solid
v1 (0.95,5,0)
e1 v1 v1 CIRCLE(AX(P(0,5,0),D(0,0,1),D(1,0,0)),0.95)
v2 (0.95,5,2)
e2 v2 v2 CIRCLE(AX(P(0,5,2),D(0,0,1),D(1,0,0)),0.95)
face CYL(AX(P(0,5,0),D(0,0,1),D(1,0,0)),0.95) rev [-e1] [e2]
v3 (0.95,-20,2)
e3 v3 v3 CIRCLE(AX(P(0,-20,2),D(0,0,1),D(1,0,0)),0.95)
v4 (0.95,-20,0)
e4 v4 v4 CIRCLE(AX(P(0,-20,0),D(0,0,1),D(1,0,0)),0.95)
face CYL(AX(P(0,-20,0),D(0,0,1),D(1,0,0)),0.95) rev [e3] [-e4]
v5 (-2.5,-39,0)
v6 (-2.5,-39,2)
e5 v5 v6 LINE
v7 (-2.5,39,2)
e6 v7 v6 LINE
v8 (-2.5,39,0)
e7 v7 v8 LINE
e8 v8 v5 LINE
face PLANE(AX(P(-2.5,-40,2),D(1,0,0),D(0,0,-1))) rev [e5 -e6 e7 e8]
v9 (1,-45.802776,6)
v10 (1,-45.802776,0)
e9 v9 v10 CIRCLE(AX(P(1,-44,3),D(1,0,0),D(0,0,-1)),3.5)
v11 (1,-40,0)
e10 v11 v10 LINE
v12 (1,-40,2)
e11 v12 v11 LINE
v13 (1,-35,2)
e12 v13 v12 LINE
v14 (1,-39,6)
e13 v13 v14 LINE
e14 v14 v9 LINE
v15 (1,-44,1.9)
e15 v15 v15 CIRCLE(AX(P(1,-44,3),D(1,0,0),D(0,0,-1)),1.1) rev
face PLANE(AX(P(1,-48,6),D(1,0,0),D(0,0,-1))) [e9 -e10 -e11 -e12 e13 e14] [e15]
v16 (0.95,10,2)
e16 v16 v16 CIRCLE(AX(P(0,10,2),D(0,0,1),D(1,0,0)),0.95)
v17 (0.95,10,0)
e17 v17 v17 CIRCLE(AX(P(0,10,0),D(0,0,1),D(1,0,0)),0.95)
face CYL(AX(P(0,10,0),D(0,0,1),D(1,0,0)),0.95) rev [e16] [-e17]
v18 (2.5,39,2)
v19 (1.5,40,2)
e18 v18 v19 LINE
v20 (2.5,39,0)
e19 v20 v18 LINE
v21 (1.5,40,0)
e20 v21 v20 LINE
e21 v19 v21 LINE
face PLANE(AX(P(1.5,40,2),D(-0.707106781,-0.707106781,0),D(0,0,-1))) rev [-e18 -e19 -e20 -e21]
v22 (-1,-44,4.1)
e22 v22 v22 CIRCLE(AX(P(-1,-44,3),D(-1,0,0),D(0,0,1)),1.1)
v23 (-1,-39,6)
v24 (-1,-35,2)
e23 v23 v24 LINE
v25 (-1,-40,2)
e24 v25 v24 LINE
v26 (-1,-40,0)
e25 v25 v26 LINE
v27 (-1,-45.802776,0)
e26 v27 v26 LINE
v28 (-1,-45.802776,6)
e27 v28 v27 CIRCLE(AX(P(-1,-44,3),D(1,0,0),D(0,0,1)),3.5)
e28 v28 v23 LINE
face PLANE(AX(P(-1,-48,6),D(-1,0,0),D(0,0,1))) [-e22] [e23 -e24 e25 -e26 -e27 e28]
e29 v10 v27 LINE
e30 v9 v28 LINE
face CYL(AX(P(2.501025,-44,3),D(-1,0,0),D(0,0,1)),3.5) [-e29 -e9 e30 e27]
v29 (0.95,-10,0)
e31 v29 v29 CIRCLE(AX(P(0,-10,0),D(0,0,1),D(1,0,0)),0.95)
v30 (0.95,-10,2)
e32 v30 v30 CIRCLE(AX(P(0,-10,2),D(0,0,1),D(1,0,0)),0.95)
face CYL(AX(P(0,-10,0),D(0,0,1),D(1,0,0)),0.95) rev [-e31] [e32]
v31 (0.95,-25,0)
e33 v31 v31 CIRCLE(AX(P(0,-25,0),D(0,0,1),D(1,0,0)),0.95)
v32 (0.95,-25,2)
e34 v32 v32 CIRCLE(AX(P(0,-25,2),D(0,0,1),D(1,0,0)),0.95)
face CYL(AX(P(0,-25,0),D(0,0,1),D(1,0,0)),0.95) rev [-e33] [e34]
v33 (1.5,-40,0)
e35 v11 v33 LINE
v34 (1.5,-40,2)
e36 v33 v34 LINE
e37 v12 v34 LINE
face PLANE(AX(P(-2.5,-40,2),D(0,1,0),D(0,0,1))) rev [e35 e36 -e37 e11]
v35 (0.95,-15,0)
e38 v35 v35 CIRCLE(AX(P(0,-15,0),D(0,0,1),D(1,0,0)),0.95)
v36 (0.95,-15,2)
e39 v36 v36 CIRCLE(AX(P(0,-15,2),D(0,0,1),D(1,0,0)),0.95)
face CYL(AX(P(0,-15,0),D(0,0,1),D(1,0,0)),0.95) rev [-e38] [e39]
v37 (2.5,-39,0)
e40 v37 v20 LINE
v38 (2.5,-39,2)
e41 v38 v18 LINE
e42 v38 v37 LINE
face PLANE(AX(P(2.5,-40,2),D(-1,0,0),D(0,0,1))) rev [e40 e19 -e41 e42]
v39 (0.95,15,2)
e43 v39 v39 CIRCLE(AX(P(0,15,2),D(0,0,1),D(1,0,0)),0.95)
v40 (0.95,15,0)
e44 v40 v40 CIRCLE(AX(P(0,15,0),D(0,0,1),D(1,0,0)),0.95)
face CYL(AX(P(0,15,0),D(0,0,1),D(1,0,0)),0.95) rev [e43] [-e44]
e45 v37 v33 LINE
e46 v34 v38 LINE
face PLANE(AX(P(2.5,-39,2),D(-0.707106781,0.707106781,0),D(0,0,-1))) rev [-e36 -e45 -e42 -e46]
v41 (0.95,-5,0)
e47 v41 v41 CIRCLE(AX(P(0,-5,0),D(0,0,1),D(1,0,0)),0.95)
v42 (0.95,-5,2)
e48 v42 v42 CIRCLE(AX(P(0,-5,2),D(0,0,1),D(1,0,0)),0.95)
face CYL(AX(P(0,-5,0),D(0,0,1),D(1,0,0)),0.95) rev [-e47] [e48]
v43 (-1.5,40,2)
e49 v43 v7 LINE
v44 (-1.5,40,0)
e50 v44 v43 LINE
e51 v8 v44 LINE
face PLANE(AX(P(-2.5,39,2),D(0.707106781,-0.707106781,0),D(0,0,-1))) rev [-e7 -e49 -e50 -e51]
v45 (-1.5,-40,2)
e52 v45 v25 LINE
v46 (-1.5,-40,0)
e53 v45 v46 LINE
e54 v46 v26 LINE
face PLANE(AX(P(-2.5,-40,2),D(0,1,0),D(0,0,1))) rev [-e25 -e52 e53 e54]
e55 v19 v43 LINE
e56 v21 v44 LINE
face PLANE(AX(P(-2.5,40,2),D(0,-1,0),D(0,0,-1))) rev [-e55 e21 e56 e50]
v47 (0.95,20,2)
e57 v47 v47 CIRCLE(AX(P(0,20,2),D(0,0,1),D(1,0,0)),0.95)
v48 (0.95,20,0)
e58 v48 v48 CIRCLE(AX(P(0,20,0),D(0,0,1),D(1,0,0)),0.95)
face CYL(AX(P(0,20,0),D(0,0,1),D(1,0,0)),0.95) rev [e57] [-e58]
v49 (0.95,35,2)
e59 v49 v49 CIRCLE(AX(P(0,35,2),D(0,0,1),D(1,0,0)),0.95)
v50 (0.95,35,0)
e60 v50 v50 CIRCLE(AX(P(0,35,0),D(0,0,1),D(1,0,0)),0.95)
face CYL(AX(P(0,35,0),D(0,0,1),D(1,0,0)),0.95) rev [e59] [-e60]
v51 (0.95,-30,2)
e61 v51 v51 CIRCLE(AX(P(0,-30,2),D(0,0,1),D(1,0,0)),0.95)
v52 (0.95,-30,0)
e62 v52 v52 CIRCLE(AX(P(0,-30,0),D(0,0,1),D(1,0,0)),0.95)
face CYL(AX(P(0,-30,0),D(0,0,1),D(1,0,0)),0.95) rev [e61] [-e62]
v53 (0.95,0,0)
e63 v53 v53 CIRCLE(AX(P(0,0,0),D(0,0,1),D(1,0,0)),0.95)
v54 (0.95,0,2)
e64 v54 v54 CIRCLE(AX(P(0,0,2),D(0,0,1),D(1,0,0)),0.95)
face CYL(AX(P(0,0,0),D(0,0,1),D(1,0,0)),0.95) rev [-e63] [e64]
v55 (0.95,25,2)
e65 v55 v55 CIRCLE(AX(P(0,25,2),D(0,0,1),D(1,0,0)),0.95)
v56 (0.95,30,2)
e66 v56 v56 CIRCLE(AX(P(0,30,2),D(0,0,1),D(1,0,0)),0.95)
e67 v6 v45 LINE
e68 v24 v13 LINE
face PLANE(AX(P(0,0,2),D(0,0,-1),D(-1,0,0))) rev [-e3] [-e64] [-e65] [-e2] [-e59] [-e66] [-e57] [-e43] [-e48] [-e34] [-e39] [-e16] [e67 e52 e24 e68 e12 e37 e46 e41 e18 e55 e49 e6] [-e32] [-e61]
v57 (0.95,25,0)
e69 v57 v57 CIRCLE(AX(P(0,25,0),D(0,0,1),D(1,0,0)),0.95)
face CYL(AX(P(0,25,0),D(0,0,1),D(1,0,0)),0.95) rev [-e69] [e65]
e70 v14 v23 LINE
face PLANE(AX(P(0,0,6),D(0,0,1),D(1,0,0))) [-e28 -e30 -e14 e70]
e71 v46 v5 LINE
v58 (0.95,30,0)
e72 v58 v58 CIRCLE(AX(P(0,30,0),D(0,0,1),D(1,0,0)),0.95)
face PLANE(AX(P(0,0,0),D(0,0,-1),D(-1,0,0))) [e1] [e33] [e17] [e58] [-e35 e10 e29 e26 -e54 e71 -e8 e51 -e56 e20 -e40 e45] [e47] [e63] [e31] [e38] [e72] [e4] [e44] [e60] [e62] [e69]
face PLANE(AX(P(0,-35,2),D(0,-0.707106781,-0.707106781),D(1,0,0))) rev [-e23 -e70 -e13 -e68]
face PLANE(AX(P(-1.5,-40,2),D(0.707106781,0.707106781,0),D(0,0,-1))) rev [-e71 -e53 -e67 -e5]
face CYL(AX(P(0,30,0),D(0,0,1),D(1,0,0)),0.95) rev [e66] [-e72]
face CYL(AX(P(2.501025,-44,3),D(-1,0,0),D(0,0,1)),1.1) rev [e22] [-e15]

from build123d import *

# Parameters (mm, degrees)
SKETCH1_W           = 5
SKETCH1_H           = 80
BOSS_EXTRUDE1_DEPTH = 2
SKETCH3_R           = 0.95
CUT_EXTRUDE1_DEPTH  = 41.127920454
SKETCH2_W           = 2
SKETCH2_H           = 8
BOSS_EXTRUDE2_DEPTH = 6
CUT_EXTRUDE2_REACH  = 50.5
SKETCH4_R           = 1.1
CHAMFER1_SIZE       = 5
CHAMFER2_SIZE       = 1


with BuildPart() as part:
    # Sketch1 → Boss-Extrude1 (new body)
    with BuildSketch(Plane.XY):
        Rectangle(SKETCH1_W, SKETCH1_H)
    extrude(amount=BOSS_EXTRUDE1_DEPTH)

    # Sketch3 → Cut-Extrude1 (cut, through all)
    with BuildSketch(Plane.XY.offset(2)):
        with Locations((0, 35)):
            Circle(SKETCH3_R)
        with Locations((0, 30)):
            Circle(SKETCH3_R)
        with Locations((0, 25)):
            Circle(SKETCH3_R)
        with Locations((0, 20)):
            Circle(SKETCH3_R)
        with Locations((0, 15)):
            Circle(SKETCH3_R)
        with Locations((0, 10)):
            Circle(SKETCH3_R)
        with Locations((0, 5)):
            Circle(SKETCH3_R)
        Circle(SKETCH3_R)
        with Locations((0, -5)):
            Circle(SKETCH3_R)
        with Locations((0, -10)):
            Circle(SKETCH3_R)
        with Locations((0, -15)):
            Circle(SKETCH3_R)
        with Locations((0, -20)):
            Circle(SKETCH3_R)
        with Locations((0, -25)):
            Circle(SKETCH3_R)
        with Locations((0, -30)):
            Circle(SKETCH3_R)
    extrude(amount=-CUT_EXTRUDE1_DEPTH, mode=Mode.SUBTRACT)

    # Sketch2 → Boss-Extrude2 (add)
    with BuildSketch(Plane(origin=(0, 0, 0), x_dir=(-1, 0, 0), z_dir=(0, 0, -1))):
        with Locations((0, -44)):
            Rectangle(SKETCH2_W, SKETCH2_H)
    extrude(amount=-BOSS_EXTRUDE2_DEPTH)

    # Sketch4 → Cut-Extrude2 (cut, up to next)
    with BuildSketch(Plane.ZY.offset(1), mode=Mode.PRIVATE) as cut_extrude2_sk1:
        with Locations((3, -44)):
            Circle(SKETCH4_R)
    cut_extrude2_tool1 = extrude(cut_extrude2_sk1.sketch, amount=-CUT_EXTRUDE2_REACH, mode=Mode.PRIVATE) & part.part
    # Sketch4 → Cut-Extrude2 (cut, up to next)
    with BuildSketch(Plane.ZY.offset(1), mode=Mode.PRIVATE) as cut_extrude2_sk2:
        with BuildLine():
            Line((0, -45.802775638), (0, -48))
            Line((0, -48), (6, -48))
            Line((6, -48), (6, -45.802775638))
            ThreePointArc((6, -45.802775638), (3, -47.5), (0, -45.802775638))
        make_face()
    cut_extrude2_tool2 = extrude(cut_extrude2_sk2.sketch, amount=-CUT_EXTRUDE2_REACH, mode=Mode.PRIVATE) & part.part
    add(cut_extrude2_tool1.solids().sort_by_distance((-1, -44, 3))[0], mode=Mode.SUBTRACT)
    add(cut_extrude2_tool2.solids().sort_by_distance((-1, -47.563897, 3))[0], mode=Mode.SUBTRACT)

    # Chamfer1
    # the kernel refuses this chamfer: 5 mm, written as the material it adds along each edge
    with BuildSketch(Plane(origin=(-1, -40, 2), x_dir=(0, 0.9996219169112968, -0.02749587661058636), z_dir=(1, 0, 0))) as chamfer1_piece_1_section:
        Polygon((CHAMFER1_SIZE * 0.999621916911, CHAMFER1_SIZE * 0.0274958766106), (-CHAMFER1_SIZE * 0.0274958766106, CHAMFER1_SIZE * 0.999621916911), (0, 0), align=None)
    chamfer1_piece_1 = extrude(amount=2, mode=Mode.PRIVATE)
    chamfer1_piece_1 = split(chamfer1_piece_1, bisect_by=Plane(origin=(0, -38.277777778, 6), z_dir=(0, 0, -1)), keep=Keep.TOP, mode=Mode.PRIVATE)
    add(chamfer1_piece_1)

    # Chamfer2
    chamfer2_edges = [part.edges().sort_by_distance(p)[0] for p in [
        (-2.5, 40, 1),
        (2.5, 40, 1),
        (-2.5, -40, 1),
        (2.5, -40, 1),
    ]]
    chamfer(chamfer2_edges, length=CHAMFER2_SIZE)


solid = part.part
